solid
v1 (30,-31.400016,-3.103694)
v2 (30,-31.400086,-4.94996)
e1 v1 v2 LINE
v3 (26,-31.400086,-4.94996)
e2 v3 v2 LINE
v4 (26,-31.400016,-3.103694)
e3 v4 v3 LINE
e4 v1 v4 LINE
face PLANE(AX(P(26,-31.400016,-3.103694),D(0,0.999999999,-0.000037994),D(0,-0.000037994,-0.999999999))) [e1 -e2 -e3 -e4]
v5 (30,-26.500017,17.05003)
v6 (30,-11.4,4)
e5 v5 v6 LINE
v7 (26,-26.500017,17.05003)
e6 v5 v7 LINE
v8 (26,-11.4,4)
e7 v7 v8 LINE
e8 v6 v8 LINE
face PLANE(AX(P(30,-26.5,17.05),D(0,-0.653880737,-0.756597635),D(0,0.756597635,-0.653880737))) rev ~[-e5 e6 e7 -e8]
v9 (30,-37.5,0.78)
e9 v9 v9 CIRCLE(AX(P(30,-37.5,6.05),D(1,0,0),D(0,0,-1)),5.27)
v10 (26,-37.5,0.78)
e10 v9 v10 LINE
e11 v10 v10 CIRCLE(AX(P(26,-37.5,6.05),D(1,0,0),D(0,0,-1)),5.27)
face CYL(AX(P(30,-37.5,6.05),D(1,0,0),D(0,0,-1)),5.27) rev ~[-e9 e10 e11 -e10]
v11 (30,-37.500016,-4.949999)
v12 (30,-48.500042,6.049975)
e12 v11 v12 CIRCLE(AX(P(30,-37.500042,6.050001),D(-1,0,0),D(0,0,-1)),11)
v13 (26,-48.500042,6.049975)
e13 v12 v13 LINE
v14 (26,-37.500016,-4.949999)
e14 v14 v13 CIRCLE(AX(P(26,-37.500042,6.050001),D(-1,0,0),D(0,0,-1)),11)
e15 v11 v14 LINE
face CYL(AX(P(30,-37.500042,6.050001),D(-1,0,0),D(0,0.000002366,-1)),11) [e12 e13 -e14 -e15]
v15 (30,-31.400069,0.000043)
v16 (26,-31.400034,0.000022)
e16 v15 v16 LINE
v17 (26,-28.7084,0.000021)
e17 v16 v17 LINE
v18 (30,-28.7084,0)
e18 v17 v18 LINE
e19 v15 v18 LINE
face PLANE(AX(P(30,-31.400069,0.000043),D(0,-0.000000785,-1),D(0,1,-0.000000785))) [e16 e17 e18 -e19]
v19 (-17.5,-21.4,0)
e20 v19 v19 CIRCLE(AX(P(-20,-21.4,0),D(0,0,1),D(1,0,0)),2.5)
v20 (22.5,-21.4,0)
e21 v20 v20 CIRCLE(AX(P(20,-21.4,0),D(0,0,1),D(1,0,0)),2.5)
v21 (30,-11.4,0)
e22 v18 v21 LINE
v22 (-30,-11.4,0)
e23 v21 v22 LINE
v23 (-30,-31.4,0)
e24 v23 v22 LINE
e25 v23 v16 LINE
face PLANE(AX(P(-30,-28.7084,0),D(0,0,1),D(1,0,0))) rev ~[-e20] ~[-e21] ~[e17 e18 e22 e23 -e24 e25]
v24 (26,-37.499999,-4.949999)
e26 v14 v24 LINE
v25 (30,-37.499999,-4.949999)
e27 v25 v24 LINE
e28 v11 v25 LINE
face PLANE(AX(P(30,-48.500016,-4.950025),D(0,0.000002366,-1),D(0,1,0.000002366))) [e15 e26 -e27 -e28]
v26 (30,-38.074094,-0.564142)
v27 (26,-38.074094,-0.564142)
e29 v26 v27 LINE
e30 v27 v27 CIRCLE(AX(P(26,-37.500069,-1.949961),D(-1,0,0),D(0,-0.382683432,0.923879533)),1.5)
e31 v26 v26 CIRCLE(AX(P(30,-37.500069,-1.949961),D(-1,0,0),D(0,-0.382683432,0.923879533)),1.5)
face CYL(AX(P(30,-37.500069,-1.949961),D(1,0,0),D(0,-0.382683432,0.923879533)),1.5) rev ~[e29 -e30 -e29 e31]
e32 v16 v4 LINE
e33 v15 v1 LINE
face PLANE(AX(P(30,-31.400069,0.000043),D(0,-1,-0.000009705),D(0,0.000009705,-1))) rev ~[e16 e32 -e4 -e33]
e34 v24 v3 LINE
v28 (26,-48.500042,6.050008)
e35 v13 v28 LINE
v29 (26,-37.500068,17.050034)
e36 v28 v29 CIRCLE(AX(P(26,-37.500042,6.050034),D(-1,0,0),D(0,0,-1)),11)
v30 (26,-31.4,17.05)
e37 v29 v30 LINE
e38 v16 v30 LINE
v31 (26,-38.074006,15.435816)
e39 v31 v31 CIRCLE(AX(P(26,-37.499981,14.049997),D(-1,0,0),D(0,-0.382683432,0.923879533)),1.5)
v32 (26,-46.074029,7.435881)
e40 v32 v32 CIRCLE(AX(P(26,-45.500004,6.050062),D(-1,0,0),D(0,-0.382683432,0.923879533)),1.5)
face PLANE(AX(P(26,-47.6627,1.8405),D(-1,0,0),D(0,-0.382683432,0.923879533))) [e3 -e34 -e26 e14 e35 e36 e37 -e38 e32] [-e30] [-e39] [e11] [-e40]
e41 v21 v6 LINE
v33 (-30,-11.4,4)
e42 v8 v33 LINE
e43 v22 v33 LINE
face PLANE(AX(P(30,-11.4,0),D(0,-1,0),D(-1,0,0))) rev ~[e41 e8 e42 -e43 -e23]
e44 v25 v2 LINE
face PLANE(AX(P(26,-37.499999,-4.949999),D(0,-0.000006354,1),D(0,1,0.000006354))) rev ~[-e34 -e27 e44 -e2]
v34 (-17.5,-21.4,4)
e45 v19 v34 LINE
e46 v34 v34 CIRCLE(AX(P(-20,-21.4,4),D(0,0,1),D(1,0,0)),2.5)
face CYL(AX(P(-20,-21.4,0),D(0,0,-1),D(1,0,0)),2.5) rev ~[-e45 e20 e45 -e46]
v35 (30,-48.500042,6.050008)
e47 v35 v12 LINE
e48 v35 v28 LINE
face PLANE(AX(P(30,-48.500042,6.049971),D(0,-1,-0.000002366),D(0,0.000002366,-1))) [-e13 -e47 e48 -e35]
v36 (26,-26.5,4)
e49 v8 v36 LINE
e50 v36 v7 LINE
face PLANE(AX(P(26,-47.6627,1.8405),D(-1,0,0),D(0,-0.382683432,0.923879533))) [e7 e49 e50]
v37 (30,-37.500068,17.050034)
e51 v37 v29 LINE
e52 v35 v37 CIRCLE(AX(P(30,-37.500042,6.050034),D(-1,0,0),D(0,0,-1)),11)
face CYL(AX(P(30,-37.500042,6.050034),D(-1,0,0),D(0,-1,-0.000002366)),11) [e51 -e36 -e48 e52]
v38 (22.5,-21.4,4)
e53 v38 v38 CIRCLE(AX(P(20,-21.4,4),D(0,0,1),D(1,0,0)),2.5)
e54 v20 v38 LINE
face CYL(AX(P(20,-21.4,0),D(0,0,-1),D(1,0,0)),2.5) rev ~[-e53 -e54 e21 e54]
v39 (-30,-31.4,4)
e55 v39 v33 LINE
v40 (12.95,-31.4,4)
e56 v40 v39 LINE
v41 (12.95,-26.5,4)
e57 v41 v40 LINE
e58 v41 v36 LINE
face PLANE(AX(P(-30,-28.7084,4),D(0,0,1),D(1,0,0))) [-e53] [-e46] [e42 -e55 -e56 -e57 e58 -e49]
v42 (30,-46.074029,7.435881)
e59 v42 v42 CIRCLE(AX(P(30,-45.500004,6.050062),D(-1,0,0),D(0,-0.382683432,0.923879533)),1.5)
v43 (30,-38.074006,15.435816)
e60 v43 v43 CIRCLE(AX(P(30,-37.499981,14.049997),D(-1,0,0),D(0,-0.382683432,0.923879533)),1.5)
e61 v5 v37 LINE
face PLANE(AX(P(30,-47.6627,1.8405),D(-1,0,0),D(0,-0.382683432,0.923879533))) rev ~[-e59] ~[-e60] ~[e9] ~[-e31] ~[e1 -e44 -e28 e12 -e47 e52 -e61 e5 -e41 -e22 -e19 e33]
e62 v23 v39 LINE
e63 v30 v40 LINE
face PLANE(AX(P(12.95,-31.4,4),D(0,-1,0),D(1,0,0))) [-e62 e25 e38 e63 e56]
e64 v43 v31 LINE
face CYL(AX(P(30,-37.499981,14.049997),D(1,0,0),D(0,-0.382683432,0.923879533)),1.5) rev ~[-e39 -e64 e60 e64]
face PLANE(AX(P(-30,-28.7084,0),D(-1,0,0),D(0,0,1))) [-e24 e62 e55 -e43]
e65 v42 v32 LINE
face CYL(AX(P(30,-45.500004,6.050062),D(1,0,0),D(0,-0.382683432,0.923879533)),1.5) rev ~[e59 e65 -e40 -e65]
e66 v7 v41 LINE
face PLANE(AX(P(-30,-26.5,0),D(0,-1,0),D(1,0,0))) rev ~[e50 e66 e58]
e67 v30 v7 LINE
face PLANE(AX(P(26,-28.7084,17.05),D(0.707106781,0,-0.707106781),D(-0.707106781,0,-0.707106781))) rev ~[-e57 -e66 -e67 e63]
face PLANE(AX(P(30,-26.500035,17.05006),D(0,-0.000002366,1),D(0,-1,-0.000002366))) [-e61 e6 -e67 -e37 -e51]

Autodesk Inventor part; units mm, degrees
ref_plane "YZ Plane" through (0, 0, 0) normal (1, 0, 0) x (0, 1, 0)
sketch "Sketch1" plane through (0, 0, 0) normal (0, 0, 1) x (1, 0, 0)
  circle A0 centre (20, -21.4) radius 2.5 projected
  circle A1 centre (20, 21.4) radius 2.5 projected
  circle A2 centre (-20, -21.4) radius 2.5 projected
  circle A3 centre (-20, 21.4) radius 2.5 projected
  line L0 (-30, 31.4) -> (-30, -31.4) projected
  line L1 (-30, -31.4) -> (30, -31.4) projected
  line L2 (30, -31.4) -> (30, 31.4) projected
  line L3 (30, 31.4) -> (-30, 31.4) projected
  line L4 (-30, -44.5) -> (60, -44.5)
  line L5 (60, -44.5) -> (60, -30.5) projected
  line L6 (-30, -30.5) -> (60, -30.5)
  line L7 (-30, -31.4) -> (30, -31.4)
  line L8 (30, -31.4) -> (30, -11.4)
  line L9 (30, -11.4) -> (-30, -11.4)
  line L10 (-30, -11.4) -> (-30, -31.4)
  line L11 (30, -11.4) -> (-30, -11.4)
  line L12 (-30, -11.4) -> (-30, -28.7084)
  line L13 (-30, -28.7084) -> (30, -28.7084)
  line L14 (30, -28.7084) -> (30, -11.4)
  point P0 (0, 0)
  dimension "d0" = 20
  dimension "d1" = 0
extrude "Extrusion1" add sketch "Sketch1" along normal blind 4 contours L9 L2 L13 L0
ref_plane "Work Plane1" through (30, -47.6627, 1.8405) normal (-1, 0, 0) x (0, -0.3826834, 0.9238795)
sketch "Sketch2" plane through (30, -47.6627, 1.8405) normal (-1, 0, 0) x (0, -0.3826834, 0.9238795)
  circle A0 centre (0, 11) radius 4 projected
  arc A1 (-10.7913, 13.1327) -> (-9.1051, 17.1723) centre (0, 11) ccw
  line L0 (-5.2583, 18.3379) -> (-11.882, 34.3288) projected
  line L1 (-5.9532, -3.3722) -> (-10.1627, 6.7905)
  line L2 (5.9532, 25.3722) -> (14.3722, 5.0468)
  line L3 (14.3722, 5.0468) -> (-5.9532, -3.3722)
  line L4 (-5.9532, -3.3722) -> (5.9532, 25.3722) construction
  line L5 (-14.3722, 16.9532) -> (14.3722, 5.0468) construction
  line L6 (-7.9238, 14.3204) -> (-13.7905, 11.8904) projected
  line L7 (-7.9238, 14.3204) -> (-31.9564, 72.3401) projected
  line L8 (-4.2095, 21.1627) -> (5.9532, 25.3722)
  line L9 (-28.0775, 29.1357) -> (1.083, -41.2639) projected
  circle A2 centre (7.391, 14.0615) radius 1.5 projected
  circle A3 centre (-7.391, 7.9385) radius 1.5 projected
  circle A4 centre (-3.0615, 18.391) radius 1.5 projected
  circle A5 centre (3.0615, 3.609) radius 1.5 projected
  circle A6 centre (0, 11) radius 4 projected
  circle A7 centre (0, 11) radius 11 projected
  point P0 (-19.9401, 43.3302)
extrude "Extrusion2" add sketch "Sketch2" along normal blind 4 contours L6 L7 A1 | A1 L3 L1 | A1 L2 L3 | L8 L2 A1
sketch "Sketch3" plane through (30, -11.4, 4) normal (1, 0, 0) x (0, 0, -1)
  line L0 (-13.05, -15.1) -> (-2.05, -15.1) projected
  line L1 (-13.05, -15.1) -> (0, 0)
  arc A0 (0, -15.2927) -> (-2.05, -15.1) centre (-2.05, -26.1) ccw projected
  line L2 (0, 0) -> (0, -15.2927)
  line L3 (0, -15.2927) -> (-13.05, -15.1)
  point P0 (4, 11.4)
extrude "Extrusion3" add sketch "Sketch3" against normal up to surface (4 mm away) contours L1 L2 A0 L0
sketch "Sketch6" plane through (26, -47.6627, 1.8405) normal (-1, 0, 0) x (0, -0.3826834, 0.9238795)
  circle A0 centre (-3.0615, 18.391) radius 1.5 projected
  circle A1 centre (-3.0615, 18.391) radius 2.75
  point P0 (-19.9401, 43.3302)
  dimension "d10" = 5.5
extrude "Extrusion5" add sketch "Sketch6" against normal up to surface (4 mm away) contours A0
sketch "Sketch7" plane through (-30, -28.7084, 0) normal (0, -1, 0) x (1, 0, 0)
  line L0 (56, 17.05) -> (42.95, 4)
  line L1 (0, 4) -> (56, 4) projected
  line L2 (42.95, 4) -> (56, 4)
  line L3 (56, -4.95) -> (56, 17.05) projected
  line L4 (56, 4) -> (56, 17.05)
  point P0 (30, 0)
  dimension "d13" = 45
extrude "Extrusion6" add sketch "Sketch7" against normal up to surface (2.2084 mm away)
sketch "Sketch8" plane through (-30, -28.7084, 0) normal (0, -1, 0) x (1, 0, 0)
  line L0 (56, 0) -> (56, 17.05) projected
  line L1 (56, 17.05) -> (42.95, 4) projected
  line L2 (0, 4) -> (42.95, 4) projected
  line L3 (0, 0) -> (0, 4) projected
  line L4 (0, 0) -> (56, 0) projected
  line L5 (0, 0) -> (56, 0) projected
  line L6 (0, 0) -> (56, 0)
  line L7 (56, 0) -> (56, 4)
  line L8 (56, 4) -> (0, 4)
  line L9 (0, 4) -> (0, 0)
  point P0 (30, 0)
ref_plane "Work Plane2" through (-30, -31.4, -6.35) normal (0, -1, 0) x (1, 0, 0)
extrude "Extrusion7" add sketch "Sketch8" along normal up to surface (2.6916 mm away) contours L4 L3 L2 L8 L0
sketch "Sketch10" plane through (12.95, -28.7084, 4) normal (0, -1, 0) x (1, 0, 0)
  line L0 (0, 0) -> (13.05, 0) projected
  line L1 (13.05, 0) -> (13.05, 13.05) projected
  line L2 (13.05, 13.05) -> (0, 0) projected
  point P0 (-12.95, -4)
extrude "Extrusion8" add sketch "Sketch10" along normal up to surface (2.6916 mm away)
sketch "Sketch12" plane through (26, -47.6627, 1.8405) normal (-1, 0, 0) x (0, -0.3826834, 0.9238795)
  circle A0 centre (7.391, 14.0615) radius 1.5 projected
  circle A1 centre (-7.391, 7.9385) radius 1.5 projected
  circle A2 centre (3.0615, 3.609) radius 1.5 projected
  circle A3 centre (0, 11) radius 4 projected
  line L0 (7.8283, 20.8452) -> (-7.9238, 14.3204) projected
  line L1 (-7.9238, 14.3204) -> (-10.7913, 13.1327) projected
  arc A4 (-10.7913, 13.1327) -> (-10.1627, 6.7905) centre (0, 11) ccw projected
  line L2 (-10.1627, 6.7905) -> (-5.9532, -3.3722) projected
  line L3 (-5.9532, -3.3722) -> (14.3722, 5.0468) projected
  line L4 (14.3722, 5.0468) -> (7.8283, 20.8452) projected
  line L5 (-10.1627, 6.7905) -> (-12.497, 12.4261)
  line L6 (-10.1627, 6.7905) -> (-5.9532, -3.3722) projected
  line L7 (-10.7913, 13.1327) -> (-12.497, 12.4261)
  line L8 (-7.9238, 14.3204) -> (-10.7913, 13.1327) projected
  point P0 (-19.9401, 43.3302)
extrude "Extrusion9" add sketch "Sketch12" against normal up to surface (4 mm away) contours A4 L5 L7
fillet "Fillet1" radius 11 2 edges at (28, -48.5, 17.05) (28, -48.5, -4.95)
sketch "Sketch15" plane through (30, -31.4, 0) normal (1, 0, 0) x (0, 0, -1)
  circle A0 centre (-6.05, -6.1) radius 4 projected
  circle A1 centre (-6.05, -6.1) radius 5.27
  point P0 (0, 31.4)
  dimension "d24" = 1.27
extrude "Extrusion10" cut sketch "Sketch15" against normal through all
properties part number "nutHolderX"
